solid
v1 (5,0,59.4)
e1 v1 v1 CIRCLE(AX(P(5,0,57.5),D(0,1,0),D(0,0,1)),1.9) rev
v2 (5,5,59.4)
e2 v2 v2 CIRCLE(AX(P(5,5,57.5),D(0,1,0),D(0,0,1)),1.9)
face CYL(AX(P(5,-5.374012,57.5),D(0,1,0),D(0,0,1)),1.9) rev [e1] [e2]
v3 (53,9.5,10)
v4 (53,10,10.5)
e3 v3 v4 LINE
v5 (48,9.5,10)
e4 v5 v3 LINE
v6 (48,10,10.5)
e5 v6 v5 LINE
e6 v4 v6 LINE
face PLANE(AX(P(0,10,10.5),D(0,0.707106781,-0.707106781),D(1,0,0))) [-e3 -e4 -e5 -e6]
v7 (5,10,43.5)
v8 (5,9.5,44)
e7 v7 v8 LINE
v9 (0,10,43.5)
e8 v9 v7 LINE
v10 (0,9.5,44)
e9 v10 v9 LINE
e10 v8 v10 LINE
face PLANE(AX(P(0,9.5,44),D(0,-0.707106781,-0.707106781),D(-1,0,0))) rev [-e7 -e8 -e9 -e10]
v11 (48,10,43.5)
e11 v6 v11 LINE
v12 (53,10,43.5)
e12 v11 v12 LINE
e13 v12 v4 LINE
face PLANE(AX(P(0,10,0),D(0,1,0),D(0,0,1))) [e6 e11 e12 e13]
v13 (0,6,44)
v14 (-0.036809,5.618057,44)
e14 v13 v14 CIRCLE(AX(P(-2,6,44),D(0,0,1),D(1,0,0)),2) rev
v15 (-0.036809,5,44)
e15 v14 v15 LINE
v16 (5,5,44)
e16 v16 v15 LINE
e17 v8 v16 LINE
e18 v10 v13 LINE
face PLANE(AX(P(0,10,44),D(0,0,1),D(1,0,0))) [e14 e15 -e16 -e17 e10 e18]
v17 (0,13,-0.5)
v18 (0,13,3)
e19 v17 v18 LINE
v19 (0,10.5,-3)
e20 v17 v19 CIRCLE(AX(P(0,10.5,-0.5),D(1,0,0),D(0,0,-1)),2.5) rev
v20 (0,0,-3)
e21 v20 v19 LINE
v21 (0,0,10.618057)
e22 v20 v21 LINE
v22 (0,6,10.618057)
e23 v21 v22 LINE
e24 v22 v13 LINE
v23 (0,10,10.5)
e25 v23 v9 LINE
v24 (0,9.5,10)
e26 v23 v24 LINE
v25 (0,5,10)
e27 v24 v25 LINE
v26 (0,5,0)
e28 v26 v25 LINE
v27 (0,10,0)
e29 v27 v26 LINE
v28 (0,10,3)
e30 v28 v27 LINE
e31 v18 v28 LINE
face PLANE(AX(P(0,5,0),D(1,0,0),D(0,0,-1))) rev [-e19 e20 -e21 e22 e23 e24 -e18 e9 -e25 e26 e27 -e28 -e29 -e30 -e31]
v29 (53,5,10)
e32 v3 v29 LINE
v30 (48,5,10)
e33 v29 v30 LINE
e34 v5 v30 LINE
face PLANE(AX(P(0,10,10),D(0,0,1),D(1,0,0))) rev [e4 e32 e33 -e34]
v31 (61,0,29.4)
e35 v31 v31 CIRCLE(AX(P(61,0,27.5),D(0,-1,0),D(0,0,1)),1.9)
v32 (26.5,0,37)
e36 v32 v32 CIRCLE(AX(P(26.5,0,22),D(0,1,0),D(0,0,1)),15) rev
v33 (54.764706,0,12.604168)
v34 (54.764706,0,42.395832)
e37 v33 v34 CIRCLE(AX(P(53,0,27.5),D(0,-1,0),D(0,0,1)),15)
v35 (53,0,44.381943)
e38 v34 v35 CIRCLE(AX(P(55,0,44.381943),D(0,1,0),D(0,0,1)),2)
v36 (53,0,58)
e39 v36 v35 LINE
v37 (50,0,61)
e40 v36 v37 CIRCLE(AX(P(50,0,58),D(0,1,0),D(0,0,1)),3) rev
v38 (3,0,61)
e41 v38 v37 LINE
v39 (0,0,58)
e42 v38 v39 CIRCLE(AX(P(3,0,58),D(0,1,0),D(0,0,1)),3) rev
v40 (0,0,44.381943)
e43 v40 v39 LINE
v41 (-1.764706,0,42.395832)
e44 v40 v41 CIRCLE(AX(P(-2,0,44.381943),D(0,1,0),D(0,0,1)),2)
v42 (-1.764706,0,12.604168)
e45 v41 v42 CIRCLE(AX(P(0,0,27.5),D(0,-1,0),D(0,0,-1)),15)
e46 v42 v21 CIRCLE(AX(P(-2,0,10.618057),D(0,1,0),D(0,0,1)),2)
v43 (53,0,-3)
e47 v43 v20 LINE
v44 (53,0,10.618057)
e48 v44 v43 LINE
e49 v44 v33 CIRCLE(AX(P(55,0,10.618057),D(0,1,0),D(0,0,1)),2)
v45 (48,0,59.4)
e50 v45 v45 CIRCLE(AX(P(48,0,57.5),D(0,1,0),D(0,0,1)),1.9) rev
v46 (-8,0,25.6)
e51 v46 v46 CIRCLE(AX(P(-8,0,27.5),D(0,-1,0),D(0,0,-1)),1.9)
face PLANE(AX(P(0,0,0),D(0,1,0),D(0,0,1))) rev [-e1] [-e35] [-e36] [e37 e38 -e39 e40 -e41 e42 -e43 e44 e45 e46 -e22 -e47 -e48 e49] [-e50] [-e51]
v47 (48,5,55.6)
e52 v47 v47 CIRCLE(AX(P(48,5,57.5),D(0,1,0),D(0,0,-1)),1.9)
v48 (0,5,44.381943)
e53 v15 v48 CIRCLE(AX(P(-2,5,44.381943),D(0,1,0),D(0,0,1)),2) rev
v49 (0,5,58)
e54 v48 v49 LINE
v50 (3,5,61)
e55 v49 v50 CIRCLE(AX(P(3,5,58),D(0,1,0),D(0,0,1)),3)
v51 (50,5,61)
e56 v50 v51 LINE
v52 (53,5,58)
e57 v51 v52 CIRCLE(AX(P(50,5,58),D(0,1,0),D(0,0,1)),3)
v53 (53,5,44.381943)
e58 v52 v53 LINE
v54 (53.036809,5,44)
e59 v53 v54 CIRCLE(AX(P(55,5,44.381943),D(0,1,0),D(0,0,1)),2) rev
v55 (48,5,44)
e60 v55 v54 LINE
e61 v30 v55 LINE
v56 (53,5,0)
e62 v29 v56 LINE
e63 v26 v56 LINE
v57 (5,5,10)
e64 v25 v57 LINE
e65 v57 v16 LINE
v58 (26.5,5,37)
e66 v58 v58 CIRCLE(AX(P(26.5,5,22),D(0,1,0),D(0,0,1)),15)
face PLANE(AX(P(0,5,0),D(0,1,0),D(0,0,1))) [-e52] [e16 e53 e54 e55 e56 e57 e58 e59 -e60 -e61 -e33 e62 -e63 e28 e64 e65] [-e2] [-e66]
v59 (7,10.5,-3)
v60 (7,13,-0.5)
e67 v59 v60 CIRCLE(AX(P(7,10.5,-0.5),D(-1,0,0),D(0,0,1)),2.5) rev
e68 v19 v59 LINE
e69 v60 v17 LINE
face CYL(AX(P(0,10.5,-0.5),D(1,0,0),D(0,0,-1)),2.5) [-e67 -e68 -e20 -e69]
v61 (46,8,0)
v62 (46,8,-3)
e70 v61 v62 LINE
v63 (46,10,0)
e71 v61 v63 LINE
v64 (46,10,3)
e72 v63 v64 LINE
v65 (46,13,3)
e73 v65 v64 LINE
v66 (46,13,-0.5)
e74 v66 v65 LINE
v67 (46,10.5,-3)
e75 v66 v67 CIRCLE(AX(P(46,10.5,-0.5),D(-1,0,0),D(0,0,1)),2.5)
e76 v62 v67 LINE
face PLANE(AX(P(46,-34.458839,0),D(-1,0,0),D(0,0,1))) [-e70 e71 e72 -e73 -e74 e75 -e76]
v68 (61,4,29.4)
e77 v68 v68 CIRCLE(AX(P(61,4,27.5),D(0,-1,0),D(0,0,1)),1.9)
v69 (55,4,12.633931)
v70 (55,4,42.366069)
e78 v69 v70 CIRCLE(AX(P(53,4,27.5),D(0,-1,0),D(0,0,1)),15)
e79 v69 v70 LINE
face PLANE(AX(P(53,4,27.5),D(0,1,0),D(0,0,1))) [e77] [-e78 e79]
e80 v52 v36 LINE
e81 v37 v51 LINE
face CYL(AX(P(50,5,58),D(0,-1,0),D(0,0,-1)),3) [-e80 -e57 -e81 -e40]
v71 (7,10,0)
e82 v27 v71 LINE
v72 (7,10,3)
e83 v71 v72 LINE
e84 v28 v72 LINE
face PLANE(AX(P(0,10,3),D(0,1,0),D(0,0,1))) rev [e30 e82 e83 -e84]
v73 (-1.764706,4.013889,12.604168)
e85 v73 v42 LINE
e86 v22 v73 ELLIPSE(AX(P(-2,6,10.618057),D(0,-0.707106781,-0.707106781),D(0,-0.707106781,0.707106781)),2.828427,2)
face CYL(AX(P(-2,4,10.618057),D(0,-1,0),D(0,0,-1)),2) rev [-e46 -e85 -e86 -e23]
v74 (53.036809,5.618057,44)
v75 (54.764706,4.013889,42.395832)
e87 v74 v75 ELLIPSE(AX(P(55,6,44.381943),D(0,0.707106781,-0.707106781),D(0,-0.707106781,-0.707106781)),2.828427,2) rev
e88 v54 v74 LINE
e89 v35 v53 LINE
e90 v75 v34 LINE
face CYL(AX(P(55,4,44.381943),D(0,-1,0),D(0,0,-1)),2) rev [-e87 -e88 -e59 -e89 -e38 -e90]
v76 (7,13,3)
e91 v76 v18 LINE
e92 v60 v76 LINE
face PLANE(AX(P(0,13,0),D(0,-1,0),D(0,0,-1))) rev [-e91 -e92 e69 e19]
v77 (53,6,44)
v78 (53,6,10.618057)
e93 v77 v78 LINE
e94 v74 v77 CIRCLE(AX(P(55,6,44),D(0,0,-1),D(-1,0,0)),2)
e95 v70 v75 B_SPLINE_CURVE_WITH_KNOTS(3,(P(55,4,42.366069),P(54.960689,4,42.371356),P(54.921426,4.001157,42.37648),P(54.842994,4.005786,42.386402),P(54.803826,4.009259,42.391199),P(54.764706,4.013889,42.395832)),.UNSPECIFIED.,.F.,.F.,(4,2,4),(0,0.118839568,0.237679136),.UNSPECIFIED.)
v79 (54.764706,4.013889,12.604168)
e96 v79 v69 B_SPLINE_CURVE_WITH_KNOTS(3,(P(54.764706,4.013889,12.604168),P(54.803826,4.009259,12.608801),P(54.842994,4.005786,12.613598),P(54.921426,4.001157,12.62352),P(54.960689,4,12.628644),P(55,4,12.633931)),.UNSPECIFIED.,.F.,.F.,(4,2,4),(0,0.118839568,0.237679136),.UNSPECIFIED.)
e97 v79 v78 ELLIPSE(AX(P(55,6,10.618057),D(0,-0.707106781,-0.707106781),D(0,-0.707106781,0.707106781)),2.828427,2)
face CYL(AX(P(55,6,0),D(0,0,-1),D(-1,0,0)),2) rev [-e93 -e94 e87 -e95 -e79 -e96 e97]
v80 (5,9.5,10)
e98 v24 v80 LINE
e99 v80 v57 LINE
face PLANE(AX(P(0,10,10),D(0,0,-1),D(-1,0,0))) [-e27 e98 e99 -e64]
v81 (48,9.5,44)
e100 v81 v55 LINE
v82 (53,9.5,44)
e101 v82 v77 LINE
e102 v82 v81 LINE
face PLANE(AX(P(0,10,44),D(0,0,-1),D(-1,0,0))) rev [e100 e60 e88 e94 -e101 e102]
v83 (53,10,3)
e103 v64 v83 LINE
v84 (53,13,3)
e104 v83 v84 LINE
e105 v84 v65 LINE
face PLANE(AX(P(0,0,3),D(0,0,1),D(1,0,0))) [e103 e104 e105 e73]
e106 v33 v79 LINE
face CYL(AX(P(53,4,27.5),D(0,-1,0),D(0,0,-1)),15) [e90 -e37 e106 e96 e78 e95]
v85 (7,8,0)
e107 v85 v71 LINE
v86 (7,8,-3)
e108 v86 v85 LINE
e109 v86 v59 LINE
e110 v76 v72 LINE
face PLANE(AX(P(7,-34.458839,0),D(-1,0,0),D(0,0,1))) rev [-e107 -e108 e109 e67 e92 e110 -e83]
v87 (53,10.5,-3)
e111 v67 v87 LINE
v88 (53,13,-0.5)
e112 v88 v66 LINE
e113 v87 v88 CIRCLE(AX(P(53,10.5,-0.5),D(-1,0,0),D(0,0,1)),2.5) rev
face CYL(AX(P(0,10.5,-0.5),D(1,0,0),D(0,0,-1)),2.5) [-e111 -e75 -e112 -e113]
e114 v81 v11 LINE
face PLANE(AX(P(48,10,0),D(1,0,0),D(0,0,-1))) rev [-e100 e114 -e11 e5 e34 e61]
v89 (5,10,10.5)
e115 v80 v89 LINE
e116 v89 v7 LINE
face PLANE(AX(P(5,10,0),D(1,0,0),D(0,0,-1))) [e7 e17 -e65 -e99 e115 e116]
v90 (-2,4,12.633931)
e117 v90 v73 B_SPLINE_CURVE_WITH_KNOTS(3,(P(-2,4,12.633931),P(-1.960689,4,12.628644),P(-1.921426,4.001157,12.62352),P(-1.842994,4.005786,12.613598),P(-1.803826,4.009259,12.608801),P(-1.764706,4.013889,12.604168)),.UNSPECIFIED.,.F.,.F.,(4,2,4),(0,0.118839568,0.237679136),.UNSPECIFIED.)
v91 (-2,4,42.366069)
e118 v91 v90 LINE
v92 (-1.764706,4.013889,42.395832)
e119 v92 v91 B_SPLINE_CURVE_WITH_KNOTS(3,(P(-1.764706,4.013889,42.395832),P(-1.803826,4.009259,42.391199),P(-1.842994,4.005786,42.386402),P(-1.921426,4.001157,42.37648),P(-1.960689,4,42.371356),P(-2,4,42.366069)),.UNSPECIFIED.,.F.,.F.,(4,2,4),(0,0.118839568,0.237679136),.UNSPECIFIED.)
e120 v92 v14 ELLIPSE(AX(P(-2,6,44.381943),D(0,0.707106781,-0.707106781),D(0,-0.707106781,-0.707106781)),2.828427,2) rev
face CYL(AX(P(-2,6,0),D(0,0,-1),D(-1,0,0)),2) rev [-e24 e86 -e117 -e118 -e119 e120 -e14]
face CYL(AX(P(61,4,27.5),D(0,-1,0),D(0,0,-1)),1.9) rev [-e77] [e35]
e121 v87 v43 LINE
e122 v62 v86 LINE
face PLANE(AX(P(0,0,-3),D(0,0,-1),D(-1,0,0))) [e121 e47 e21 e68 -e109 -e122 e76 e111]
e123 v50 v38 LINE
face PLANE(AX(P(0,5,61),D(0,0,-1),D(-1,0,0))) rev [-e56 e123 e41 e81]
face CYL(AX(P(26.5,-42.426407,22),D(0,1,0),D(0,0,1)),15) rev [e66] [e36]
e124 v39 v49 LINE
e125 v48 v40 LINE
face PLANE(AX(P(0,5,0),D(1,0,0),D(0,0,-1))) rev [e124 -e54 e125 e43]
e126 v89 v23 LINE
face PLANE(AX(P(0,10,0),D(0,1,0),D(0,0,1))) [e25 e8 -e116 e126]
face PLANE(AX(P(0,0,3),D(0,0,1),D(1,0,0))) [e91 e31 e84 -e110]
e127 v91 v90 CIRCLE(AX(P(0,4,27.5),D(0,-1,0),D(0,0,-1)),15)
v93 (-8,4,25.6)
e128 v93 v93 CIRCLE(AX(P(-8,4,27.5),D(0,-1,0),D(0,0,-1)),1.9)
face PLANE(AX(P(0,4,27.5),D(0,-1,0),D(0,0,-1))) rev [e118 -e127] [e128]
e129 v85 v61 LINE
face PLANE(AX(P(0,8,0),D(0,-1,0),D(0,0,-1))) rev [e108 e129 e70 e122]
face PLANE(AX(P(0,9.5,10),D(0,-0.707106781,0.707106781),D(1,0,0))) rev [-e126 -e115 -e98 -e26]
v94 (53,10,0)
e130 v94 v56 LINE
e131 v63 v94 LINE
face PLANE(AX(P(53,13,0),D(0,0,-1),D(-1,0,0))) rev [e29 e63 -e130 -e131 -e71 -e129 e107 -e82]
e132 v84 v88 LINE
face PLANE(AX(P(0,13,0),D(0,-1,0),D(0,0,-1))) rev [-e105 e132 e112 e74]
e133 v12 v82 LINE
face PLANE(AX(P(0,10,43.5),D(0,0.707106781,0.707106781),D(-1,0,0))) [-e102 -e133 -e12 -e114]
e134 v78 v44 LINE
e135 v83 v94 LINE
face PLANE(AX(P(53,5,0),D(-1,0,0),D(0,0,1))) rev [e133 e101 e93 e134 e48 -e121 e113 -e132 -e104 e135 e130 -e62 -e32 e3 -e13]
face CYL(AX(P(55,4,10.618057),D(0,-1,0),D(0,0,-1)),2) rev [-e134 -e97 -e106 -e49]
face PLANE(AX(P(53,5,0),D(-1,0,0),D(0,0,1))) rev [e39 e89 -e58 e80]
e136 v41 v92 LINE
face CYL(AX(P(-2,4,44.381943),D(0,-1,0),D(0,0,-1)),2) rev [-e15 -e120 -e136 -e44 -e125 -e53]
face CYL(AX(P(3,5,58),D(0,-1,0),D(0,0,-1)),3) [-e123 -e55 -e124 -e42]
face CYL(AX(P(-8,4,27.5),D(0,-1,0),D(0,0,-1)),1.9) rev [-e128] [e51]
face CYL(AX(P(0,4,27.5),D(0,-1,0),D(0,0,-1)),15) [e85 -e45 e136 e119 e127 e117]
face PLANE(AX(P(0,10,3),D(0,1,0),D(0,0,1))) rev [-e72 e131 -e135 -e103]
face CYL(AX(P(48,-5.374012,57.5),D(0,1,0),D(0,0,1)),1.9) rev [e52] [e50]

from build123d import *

# Parameters (mm, degrees)
SKETCH1_W           = 53
SKETCH1_H           = 61
BOSS_EXTRUDE1_DEPTH = 5
SKETCH2_W           = 5
SKETCH2_H           = 34
BOSS_EXTRUDE2_DEPTH = 5
SKETCH3_W           = 53
SKETCH3_H           = 5
BOSS_EXTRUDE3_DEPTH = 3
SKETCH4_W           = 53
SKETCH4_H           = 3
BOSS_EXTRUDE4_DEPTH = 8
SKETCH5_W           = 53
SKETCH5_H           = 3
BOSS_EXTRUDE5_DEPTH = 3
CUT_EXTRUDE1_REACH  = 83.847
SKETCH6_W           = 19.5
SKETCH6_H           = 6
CHAMFER1_SIZE       = 0.5
FILLET1_R           = 2.5
SKETCH7_R           = 15
CUT_EXTRUDE2_DEPTH  = 5
FILLET2_R           = 3
SKETCH8_W           = 39
SKETCH8_H           = 3
BOSS_EXTRUDE6_DEPTH = 3
SKETCH10_R          = 1.9
BOSS_EXTRUDE7_DEPTH = 4
FILLET3_START       = 4
FILLET3_DEPTH       = 2
FILLET3_2_DEPTH     = 5
FILLET3_START_2     = 10
FILLET3_3_DEPTH     = 34.381943016
SKETCH11_R          = 1.9
CUT_EXTRUDE3_DEPTH  = 5


with BuildPart() as part:
    # Sketch1 → Boss-Extrude1 (new body)
    with BuildSketch(Plane(origin=(0, 0, 0), x_dir=(1, 0, 0), z_dir=(0, 1, 0))):
        with Locations((26.5, -30.5)):
            Rectangle(SKETCH1_W, SKETCH1_H)
    extrude(amount=BOSS_EXTRUDE1_DEPTH)

    # Sketch2 → Boss-Extrude2 (add)
    with BuildSketch(Plane(origin=(0, 5, 0), x_dir=(1, 0, 0), z_dir=(0, 1, 0))):
        with Locations((2.5, -27)):
            Rectangle(SKETCH2_W, SKETCH2_H)
        with Locations((50.5, -27)):
            Rectangle(SKETCH2_W, SKETCH2_H)
    extrude(amount=BOSS_EXTRUDE2_DEPTH)

    # Sketch3 → Boss-Extrude3 (add)
    with BuildSketch(Plane(origin=(0, 0, 0), x_dir=(-1, 0, 0), z_dir=(0, 0, -1))):
        with Locations((-26.5, 2.5)):
            Rectangle(SKETCH3_W, SKETCH3_H)
    extrude(amount=BOSS_EXTRUDE3_DEPTH)

    # Sketch4 → Boss-Extrude4 (add)
    with BuildSketch(Plane(origin=(0, 5, 0), x_dir=(1, 0, 0), z_dir=(0, 1, 0))):
        with Locations((26.5, 1.5)):
            Rectangle(SKETCH4_W, SKETCH4_H)
    extrude(amount=BOSS_EXTRUDE4_DEPTH)

    # Sketch5 → Boss-Extrude5 (add)
    with BuildSketch(Plane.XY):
        with Locations((26.5, 11.5)):
            Rectangle(SKETCH5_W, SKETCH5_H)
    extrude(amount=BOSS_EXTRUDE5_DEPTH)

    # Cut-Extrude1: up to this face of the body (flat: up to its plane)
    cut_extrude1_end = Plane(part.part.faces().sort_by_distance((26.5, 5, 30.911337712))[0])
    # Sketch6 → Cut-Extrude1 (cut, up to the picked face)
    with BuildSketch(Plane(origin=(0, 13, 0), x_dir=(1, 0, 0), z_dir=(0, 1, 0)), mode=Mode.PRIVATE) as cut_extrude1_sk1:
        with Locations((36.25, 0)):
            Rectangle(SKETCH6_W, SKETCH6_H)
    cut_extrude1_tool1 = split(extrude(cut_extrude1_sk1.sketch, amount=-CUT_EXTRUDE1_REACH, mode=Mode.PRIVATE), bisect_by=cut_extrude1_end, keep=Keep.BOTH, mode=Mode.PRIVATE)
    # Sketch6 → Cut-Extrude1 (cut, up to the picked face)
    with BuildSketch(Plane(origin=(0, 13, 0), x_dir=(1, 0, 0), z_dir=(0, 1, 0)), mode=Mode.PRIVATE) as cut_extrude1_sk2:
        with Locations((16.75, 0)):
            Rectangle(SKETCH6_W, SKETCH6_H)
    cut_extrude1_tool2 = split(extrude(cut_extrude1_sk2.sketch, amount=-CUT_EXTRUDE1_REACH, mode=Mode.PRIVATE), bisect_by=cut_extrude1_end, keep=Keep.BOTH, mode=Mode.PRIVATE)
    add(cut_extrude1_tool1.solids().sort_by(Axis((36.25, 13, 0), (0, -1, 0)))[0], mode=Mode.SUBTRACT)
    add(cut_extrude1_tool2.solids().sort_by(Axis((16.75, 13, 0), (0, -1, 0)))[0], mode=Mode.SUBTRACT)

    # Chamfer1
    chamfer1_edges = [part.edges().sort_by_distance(p)[0] for p in [
        (2.5, 10, 10),
        (2.5, 10, 44),
        (50.5, 10, 44),
        (50.5, 10, 10),
    ]]
    chamfer(chamfer1_edges, length=CHAMFER1_SIZE)

    # Fillet1
    fillet1_edges = [part.edges().sort_by_distance(p)[0] for p in [
        (3.5, 13, -3),
        (49.5, 13, -3),
    ]]
    fillet(fillet1_edges, radius=FILLET1_R)

    # Sketch7 → Cut-Extrude2 (cut)
    with BuildSketch(Plane(origin=(0, 5, 0), x_dir=(1, 0, 0), z_dir=(0, 1, 0))):
        with Locations(Location((26.5, -22, 0), (0, 0, 270))):
            Circle(SKETCH7_R)
    extrude(amount=-CUT_EXTRUDE2_DEPTH, mode=Mode.SUBTRACT)

    # Fillet2
    fillet2_edges = [part.edges().sort_by_distance(p)[0] for p in [
        (53, 2.5, 61),
        (0, 2.5, 61),
    ]]
    fillet(fillet2_edges, radius=FILLET2_R)

    # Sketch8 → Boss-Extrude6 (add)
    with BuildSketch(Plane(origin=(0, 5, 0), x_dir=(1, 0, 0), z_dir=(0, 1, 0))):
        with Locations((26.5, 1.5)):
            Rectangle(SKETCH8_W, SKETCH8_H)
    extrude(amount=BOSS_EXTRUDE6_DEPTH)

    # Sketch10 → Boss-Extrude7 (add)
    # profile 1 of 2: a face of its own
    with BuildSketch(Plane.XZ):
        with BuildLine():
            Line((53, 12.5), (53, 42.5))
            ThreePointArc((53, 42.5), (68, 27.5), (53, 12.5))
        make_face()
        with Locations(Location((61, 27.5, 0), (0, 0, 90))):
            Circle(SKETCH10_R, mode=Mode.SUBTRACT)
    # profile 2 of 2: a face of its own
    with BuildSketch(Plane.XZ):
        with BuildLine():
            Line((0, 12.5), (0, 42.5))
            ThreePointArc((0, 42.5), (-15, 27.5), (0, 12.5))
        make_face()
        with Locations(Location((-8, 27.5, 0), (0, 0, 270))):
            Circle(SKETCH10_R, mode=Mode.SUBTRACT)
    extrude(amount=-BOSS_EXTRUDE7_DEPTH)

    # Fillet3: read off the stored shape, not the designer's step
    # Fillet3 outline → Fillet3 (add)
    with BuildSketch(Plane(origin=(0, 0, 0), x_dir=(1, 0, 0), z_dir=(0, 1, 0)).offset(FILLET3_START)):
        with BuildLine():
            ThreePointArc((0, -10.618056984), (-0.504909997, -11.946479312), (-1.764705882, -12.604167927))
            ThreePointArc((-1.764705882, -12.604167927), (-15, -27.5), (-1.764705882, -42.395832073))
            ThreePointArc((-1.764705882, -42.395832073), (-0.639238058, -42.916225808), (-0.03680884, -44))
            Line((-0.03680884, -44), (0, -44))
            Line((0, -44), (0, -10.618056984))
        make_face()
        with BuildLine():
            Line((53, -44), (53.03680884, -44))
            ThreePointArc((53.03680884, -44), (53.639238058, -42.916225808), (54.764705882, -42.395832073))
            ThreePointArc((54.764705882, -42.395832073), (68, -27.5), (54.764705882, -12.604167927))
            ThreePointArc((54.764705882, -12.604167927), (53.504909997, -11.946479312), (53, -10.618056984))
            Line((53, -10.618056984), (53, -44))
        make_face()
    extrude(amount=FILLET3_DEPTH)

    # Fillet3 2 outline → Fillet3 2 (add)
    with BuildSketch(Plane(origin=(0, 0, 0), x_dir=(1, 0, 0), z_dir=(0, 1, 0))):
        with BuildLine():
            Line((0, -12.5), (0, -10.618056984))
            ThreePointArc((0, -10.618056984), (-0.504909997, -11.946479312), (-1.764705882, -12.604167927))
            ThreePointArc((-1.764705882, -12.604167927), (-0.883888823, -12.526064627), (0, -12.5))
        make_face()
        with BuildLine():
            ThreePointArc((0, -42.5), (-0.883888823, -42.473935373), (-1.764705882, -42.395832073))
            ThreePointArc((-1.764705882, -42.395832073), (-0.504909997, -43.053520688), (0, -44.381943016))
            Line((0, -44.381943016), (0, -42.5))
        make_face()
        with BuildLine():
            ThreePointArc((53, -44.381943016), (53.504909997, -43.053520688), (54.764705882, -42.395832073))
            ThreePointArc((54.764705882, -42.395832073), (53.883888823, -42.473935373), (53, -42.5))
            Line((53, -42.5), (53, -44.381943016))
        make_face()
        with BuildLine():
            ThreePointArc((53, -12.5), (53.883888823, -12.526064627), (54.764705882, -12.604167927))
            ThreePointArc((54.764705882, -12.604167927), (53.504909997, -11.946479312), (53, -10.618056984))
            Line((53, -10.618056984), (53, -12.5))
        make_face()
    extrude(amount=FILLET3_2_DEPTH)

    # Fillet3 3 outline → Fillet3 3 (cut)
    with BuildSketch(Plane.XY.offset(FILLET3_START_2)):
        with BuildLine():
            Line((-16, 4), (-2, 4))
            ThreePointArc((-2, 4), (-0.585786438, 4.585786438), (0, 6))
            Line((0, 6), (-16, 6))
            Line((-16, 6), (-16, 4))
        make_face()
        with BuildLine():
            ThreePointArc((53, 6), (53.585786438, 4.585786438), (55, 4))
            Line((55, 4), (69, 4))
            Line((69, 4), (69, 6))
            Line((69, 6), (53, 6))
        make_face()
    extrude(amount=FILLET3_3_DEPTH, mode=Mode.SUBTRACT)

    # Sketch11 → Cut-Extrude3 (cut)
    with BuildSketch(Plane(origin=(0, 5, 0), x_dir=(1, 0, 0), z_dir=(0, 1, 0))):
        with Locations(Location((5, -57.5, 0), (0, 0, 270))):
            Circle(SKETCH11_R)
        with Locations(Location((48, -57.5, 0), (0, 0, 270))):
            Circle(SKETCH11_R)
    extrude(amount=-CUT_EXTRUDE3_DEPTH, mode=Mode.SUBTRACT)


solid = part.part
